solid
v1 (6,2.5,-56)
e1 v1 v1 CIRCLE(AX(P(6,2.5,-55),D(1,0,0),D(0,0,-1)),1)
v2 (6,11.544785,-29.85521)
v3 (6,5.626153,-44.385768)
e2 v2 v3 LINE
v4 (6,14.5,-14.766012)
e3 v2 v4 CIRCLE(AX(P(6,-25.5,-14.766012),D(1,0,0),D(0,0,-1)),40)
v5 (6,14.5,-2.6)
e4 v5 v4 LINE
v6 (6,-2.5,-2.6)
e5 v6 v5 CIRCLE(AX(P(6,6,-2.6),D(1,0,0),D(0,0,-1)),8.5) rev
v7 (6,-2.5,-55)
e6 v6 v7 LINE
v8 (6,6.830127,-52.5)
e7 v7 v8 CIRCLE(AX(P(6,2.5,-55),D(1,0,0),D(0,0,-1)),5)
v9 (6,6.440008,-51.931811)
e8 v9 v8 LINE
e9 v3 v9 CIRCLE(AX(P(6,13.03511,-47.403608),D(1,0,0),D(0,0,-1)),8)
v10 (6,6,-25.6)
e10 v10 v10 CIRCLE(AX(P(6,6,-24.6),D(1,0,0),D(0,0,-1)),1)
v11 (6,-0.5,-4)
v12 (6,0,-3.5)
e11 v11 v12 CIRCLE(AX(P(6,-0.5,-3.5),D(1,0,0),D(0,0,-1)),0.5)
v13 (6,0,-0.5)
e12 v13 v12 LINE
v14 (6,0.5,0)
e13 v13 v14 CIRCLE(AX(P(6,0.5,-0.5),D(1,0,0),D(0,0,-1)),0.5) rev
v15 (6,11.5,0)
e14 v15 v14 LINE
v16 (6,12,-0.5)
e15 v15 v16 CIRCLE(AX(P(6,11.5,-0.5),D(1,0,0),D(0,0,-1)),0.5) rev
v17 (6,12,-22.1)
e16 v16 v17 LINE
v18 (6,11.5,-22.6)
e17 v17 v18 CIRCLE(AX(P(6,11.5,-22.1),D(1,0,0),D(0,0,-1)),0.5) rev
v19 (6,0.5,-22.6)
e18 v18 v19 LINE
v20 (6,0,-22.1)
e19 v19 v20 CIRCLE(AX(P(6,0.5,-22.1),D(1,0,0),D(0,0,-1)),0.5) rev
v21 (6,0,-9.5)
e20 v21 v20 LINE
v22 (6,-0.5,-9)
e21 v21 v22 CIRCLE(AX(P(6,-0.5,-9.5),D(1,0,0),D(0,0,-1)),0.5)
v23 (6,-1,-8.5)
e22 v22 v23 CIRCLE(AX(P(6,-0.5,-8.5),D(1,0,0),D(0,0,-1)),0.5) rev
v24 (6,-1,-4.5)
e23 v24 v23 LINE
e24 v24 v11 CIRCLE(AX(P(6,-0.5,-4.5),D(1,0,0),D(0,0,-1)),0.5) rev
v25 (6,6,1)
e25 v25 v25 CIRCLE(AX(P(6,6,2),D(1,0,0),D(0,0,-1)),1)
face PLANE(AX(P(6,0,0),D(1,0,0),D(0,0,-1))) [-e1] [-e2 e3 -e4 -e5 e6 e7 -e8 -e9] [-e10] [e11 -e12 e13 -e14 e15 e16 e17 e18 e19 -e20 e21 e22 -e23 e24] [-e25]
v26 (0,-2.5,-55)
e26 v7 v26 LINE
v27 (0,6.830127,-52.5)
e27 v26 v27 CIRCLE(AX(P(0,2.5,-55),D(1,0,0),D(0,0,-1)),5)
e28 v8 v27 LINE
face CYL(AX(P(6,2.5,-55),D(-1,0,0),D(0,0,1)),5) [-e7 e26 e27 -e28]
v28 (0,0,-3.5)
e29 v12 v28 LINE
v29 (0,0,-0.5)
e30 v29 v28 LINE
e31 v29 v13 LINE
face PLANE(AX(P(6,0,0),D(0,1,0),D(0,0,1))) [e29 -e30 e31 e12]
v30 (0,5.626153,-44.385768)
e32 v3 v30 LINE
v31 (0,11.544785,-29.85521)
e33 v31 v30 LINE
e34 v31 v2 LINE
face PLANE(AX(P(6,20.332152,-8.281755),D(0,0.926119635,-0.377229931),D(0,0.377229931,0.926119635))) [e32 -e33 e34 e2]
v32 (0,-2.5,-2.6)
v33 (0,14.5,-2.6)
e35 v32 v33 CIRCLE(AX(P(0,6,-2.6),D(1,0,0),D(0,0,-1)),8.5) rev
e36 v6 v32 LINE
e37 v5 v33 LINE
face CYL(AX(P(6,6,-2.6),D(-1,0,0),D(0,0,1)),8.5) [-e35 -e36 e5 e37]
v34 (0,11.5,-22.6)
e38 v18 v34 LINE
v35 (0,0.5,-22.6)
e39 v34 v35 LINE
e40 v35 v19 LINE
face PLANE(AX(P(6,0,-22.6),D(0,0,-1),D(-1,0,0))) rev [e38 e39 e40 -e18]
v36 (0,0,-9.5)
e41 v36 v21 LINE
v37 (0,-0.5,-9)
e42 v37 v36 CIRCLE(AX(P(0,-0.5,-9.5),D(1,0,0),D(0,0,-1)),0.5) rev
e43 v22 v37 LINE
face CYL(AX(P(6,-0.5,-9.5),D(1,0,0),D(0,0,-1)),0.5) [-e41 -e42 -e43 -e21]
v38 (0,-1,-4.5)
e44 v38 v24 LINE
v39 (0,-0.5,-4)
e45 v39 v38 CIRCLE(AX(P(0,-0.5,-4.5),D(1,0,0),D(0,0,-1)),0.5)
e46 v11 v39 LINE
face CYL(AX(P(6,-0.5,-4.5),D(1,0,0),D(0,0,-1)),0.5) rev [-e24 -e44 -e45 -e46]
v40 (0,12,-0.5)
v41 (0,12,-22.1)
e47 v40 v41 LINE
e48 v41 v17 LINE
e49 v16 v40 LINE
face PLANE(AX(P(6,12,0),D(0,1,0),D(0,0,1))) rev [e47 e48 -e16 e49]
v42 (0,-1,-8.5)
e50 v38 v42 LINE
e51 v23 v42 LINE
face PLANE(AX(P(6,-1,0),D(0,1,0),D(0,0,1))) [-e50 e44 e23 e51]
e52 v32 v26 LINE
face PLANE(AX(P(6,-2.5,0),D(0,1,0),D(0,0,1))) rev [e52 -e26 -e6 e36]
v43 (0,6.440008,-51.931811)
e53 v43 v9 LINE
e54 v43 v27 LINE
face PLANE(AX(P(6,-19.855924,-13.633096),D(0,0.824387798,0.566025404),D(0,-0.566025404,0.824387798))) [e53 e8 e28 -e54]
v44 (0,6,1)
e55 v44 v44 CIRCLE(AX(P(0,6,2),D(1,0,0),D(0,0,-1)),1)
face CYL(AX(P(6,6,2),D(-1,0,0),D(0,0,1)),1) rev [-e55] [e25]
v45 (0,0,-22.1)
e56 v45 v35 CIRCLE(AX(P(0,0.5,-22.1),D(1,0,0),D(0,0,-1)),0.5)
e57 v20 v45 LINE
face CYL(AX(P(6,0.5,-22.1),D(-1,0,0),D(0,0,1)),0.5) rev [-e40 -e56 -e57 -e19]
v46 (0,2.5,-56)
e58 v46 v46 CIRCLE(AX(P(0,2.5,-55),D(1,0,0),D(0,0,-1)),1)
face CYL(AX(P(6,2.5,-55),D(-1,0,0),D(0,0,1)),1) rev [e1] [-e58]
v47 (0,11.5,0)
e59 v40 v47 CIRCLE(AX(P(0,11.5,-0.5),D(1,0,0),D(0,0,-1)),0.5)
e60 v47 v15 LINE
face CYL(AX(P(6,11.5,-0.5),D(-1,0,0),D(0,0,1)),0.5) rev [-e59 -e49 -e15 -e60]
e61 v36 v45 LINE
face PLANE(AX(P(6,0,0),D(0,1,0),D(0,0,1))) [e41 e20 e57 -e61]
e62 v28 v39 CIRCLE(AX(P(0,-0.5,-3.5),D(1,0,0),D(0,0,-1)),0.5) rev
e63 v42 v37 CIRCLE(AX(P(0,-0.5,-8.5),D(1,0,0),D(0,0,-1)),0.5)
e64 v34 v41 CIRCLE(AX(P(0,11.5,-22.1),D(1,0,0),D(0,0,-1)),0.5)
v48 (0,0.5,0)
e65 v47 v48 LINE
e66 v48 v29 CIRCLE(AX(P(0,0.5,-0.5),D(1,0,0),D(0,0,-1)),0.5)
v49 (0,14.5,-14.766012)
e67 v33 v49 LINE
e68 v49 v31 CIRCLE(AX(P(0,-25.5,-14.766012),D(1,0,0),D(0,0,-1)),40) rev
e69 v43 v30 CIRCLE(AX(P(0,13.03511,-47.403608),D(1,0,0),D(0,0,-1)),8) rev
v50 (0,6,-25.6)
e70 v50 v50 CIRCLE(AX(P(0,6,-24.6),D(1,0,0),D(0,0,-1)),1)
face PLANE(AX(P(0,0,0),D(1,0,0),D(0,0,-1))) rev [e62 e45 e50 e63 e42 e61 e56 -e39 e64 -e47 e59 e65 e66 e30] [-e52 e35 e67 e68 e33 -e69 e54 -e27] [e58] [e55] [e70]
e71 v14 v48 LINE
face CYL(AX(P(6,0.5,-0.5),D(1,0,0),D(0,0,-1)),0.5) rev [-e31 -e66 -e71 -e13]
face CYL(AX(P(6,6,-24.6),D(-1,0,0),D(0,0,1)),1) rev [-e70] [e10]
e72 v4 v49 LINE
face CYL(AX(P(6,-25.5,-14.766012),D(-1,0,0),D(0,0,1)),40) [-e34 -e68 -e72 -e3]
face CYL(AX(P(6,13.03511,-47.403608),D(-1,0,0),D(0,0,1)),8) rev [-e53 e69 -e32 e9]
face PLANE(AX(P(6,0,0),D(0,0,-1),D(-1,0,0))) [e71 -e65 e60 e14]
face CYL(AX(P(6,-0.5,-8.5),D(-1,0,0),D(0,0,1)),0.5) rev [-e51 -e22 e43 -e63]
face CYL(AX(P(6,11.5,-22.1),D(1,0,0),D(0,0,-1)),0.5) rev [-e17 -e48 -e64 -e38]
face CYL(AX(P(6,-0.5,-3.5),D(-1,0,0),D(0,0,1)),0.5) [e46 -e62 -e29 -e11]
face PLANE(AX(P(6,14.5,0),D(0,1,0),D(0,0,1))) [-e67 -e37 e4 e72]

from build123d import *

# Parameters (mm, degrees)
SCHIZZO1_R                   = 1
ESTRUSIONE_ESTRUSIONE1_DEPTH = 6
RACCORDO1_R                  = 8
RACCORDO2_R                  = 40
RACCORDO3_R                  = 0.5


with BuildPart() as part:
    # Schizzo1 → Estrusione-Estrusione1 (new body)
    with BuildSketch(Plane(origin=(0, 0, 0), x_dir=(0, 0, -1), z_dir=(1, 0, 0))):
        with BuildLine():
            Line((22.6, 14.5), (2.6, 14.5))
            ThreePointArc((2.6, 14.5), (-5.9, 6), (2.6, -2.5))
            Line((2.6, -2.5), (55, -2.5))
            ThreePointArc((55, -2.5), (59.829629131, 3.794095226), (52.5, 6.830127019))
            Line((52.5, 6.830127019), (48.378061008, 4))
            Line((48.378061008, 4), (22.6, 14.5))
        make_face()
        Polygon((0, 0), (0, 12), (22.6, 12), (22.6, 0), (9, 0), (9, -1), (4, -1), (4, 0), align=None, mode=Mode.SUBTRACT)
        with Locations((-2, 6)):
            Circle(SCHIZZO1_R, mode=Mode.SUBTRACT)
        with Locations((24.6, 6)):
            Circle(SCHIZZO1_R, mode=Mode.SUBTRACT)
        with Locations((55, 2.5)):
            Circle(SCHIZZO1_R, mode=Mode.SUBTRACT)
    extrude(amount=ESTRUSIONE_ESTRUSIONE1_DEPTH)

    # Raccordo1
    raccordo1_edges = [part.edges().sort_by_distance(p)[0] for p in [
        (3, 4, -48.378061008),
    ]]
    fillet(raccordo1_edges, radius=RACCORDO1_R)

    # Raccordo2
    raccordo2_edges = [part.edges().sort_by_distance(p)[0] for p in [
        (3, 14.5, -22.6),
    ]]
    fillet(raccordo2_edges, radius=RACCORDO2_R)

    # Raccordo3
    raccordo3_edges = [part.edges().sort_by_distance(p)[0] for p in [
        (3, 0, -22.6),
        (3, 0, 0),
        (3, 12, 0),
        (3, 12, -22.6),
        (3, 0, -4),
        (3, -1, -4),
        (3, -1, -9),
        (3, 0, -9),
    ]]
    fillet(raccordo3_edges, radius=RACCORDO3_R - 0.0001)  # a hair under: the kernel refuses the full size


solid = part.part
